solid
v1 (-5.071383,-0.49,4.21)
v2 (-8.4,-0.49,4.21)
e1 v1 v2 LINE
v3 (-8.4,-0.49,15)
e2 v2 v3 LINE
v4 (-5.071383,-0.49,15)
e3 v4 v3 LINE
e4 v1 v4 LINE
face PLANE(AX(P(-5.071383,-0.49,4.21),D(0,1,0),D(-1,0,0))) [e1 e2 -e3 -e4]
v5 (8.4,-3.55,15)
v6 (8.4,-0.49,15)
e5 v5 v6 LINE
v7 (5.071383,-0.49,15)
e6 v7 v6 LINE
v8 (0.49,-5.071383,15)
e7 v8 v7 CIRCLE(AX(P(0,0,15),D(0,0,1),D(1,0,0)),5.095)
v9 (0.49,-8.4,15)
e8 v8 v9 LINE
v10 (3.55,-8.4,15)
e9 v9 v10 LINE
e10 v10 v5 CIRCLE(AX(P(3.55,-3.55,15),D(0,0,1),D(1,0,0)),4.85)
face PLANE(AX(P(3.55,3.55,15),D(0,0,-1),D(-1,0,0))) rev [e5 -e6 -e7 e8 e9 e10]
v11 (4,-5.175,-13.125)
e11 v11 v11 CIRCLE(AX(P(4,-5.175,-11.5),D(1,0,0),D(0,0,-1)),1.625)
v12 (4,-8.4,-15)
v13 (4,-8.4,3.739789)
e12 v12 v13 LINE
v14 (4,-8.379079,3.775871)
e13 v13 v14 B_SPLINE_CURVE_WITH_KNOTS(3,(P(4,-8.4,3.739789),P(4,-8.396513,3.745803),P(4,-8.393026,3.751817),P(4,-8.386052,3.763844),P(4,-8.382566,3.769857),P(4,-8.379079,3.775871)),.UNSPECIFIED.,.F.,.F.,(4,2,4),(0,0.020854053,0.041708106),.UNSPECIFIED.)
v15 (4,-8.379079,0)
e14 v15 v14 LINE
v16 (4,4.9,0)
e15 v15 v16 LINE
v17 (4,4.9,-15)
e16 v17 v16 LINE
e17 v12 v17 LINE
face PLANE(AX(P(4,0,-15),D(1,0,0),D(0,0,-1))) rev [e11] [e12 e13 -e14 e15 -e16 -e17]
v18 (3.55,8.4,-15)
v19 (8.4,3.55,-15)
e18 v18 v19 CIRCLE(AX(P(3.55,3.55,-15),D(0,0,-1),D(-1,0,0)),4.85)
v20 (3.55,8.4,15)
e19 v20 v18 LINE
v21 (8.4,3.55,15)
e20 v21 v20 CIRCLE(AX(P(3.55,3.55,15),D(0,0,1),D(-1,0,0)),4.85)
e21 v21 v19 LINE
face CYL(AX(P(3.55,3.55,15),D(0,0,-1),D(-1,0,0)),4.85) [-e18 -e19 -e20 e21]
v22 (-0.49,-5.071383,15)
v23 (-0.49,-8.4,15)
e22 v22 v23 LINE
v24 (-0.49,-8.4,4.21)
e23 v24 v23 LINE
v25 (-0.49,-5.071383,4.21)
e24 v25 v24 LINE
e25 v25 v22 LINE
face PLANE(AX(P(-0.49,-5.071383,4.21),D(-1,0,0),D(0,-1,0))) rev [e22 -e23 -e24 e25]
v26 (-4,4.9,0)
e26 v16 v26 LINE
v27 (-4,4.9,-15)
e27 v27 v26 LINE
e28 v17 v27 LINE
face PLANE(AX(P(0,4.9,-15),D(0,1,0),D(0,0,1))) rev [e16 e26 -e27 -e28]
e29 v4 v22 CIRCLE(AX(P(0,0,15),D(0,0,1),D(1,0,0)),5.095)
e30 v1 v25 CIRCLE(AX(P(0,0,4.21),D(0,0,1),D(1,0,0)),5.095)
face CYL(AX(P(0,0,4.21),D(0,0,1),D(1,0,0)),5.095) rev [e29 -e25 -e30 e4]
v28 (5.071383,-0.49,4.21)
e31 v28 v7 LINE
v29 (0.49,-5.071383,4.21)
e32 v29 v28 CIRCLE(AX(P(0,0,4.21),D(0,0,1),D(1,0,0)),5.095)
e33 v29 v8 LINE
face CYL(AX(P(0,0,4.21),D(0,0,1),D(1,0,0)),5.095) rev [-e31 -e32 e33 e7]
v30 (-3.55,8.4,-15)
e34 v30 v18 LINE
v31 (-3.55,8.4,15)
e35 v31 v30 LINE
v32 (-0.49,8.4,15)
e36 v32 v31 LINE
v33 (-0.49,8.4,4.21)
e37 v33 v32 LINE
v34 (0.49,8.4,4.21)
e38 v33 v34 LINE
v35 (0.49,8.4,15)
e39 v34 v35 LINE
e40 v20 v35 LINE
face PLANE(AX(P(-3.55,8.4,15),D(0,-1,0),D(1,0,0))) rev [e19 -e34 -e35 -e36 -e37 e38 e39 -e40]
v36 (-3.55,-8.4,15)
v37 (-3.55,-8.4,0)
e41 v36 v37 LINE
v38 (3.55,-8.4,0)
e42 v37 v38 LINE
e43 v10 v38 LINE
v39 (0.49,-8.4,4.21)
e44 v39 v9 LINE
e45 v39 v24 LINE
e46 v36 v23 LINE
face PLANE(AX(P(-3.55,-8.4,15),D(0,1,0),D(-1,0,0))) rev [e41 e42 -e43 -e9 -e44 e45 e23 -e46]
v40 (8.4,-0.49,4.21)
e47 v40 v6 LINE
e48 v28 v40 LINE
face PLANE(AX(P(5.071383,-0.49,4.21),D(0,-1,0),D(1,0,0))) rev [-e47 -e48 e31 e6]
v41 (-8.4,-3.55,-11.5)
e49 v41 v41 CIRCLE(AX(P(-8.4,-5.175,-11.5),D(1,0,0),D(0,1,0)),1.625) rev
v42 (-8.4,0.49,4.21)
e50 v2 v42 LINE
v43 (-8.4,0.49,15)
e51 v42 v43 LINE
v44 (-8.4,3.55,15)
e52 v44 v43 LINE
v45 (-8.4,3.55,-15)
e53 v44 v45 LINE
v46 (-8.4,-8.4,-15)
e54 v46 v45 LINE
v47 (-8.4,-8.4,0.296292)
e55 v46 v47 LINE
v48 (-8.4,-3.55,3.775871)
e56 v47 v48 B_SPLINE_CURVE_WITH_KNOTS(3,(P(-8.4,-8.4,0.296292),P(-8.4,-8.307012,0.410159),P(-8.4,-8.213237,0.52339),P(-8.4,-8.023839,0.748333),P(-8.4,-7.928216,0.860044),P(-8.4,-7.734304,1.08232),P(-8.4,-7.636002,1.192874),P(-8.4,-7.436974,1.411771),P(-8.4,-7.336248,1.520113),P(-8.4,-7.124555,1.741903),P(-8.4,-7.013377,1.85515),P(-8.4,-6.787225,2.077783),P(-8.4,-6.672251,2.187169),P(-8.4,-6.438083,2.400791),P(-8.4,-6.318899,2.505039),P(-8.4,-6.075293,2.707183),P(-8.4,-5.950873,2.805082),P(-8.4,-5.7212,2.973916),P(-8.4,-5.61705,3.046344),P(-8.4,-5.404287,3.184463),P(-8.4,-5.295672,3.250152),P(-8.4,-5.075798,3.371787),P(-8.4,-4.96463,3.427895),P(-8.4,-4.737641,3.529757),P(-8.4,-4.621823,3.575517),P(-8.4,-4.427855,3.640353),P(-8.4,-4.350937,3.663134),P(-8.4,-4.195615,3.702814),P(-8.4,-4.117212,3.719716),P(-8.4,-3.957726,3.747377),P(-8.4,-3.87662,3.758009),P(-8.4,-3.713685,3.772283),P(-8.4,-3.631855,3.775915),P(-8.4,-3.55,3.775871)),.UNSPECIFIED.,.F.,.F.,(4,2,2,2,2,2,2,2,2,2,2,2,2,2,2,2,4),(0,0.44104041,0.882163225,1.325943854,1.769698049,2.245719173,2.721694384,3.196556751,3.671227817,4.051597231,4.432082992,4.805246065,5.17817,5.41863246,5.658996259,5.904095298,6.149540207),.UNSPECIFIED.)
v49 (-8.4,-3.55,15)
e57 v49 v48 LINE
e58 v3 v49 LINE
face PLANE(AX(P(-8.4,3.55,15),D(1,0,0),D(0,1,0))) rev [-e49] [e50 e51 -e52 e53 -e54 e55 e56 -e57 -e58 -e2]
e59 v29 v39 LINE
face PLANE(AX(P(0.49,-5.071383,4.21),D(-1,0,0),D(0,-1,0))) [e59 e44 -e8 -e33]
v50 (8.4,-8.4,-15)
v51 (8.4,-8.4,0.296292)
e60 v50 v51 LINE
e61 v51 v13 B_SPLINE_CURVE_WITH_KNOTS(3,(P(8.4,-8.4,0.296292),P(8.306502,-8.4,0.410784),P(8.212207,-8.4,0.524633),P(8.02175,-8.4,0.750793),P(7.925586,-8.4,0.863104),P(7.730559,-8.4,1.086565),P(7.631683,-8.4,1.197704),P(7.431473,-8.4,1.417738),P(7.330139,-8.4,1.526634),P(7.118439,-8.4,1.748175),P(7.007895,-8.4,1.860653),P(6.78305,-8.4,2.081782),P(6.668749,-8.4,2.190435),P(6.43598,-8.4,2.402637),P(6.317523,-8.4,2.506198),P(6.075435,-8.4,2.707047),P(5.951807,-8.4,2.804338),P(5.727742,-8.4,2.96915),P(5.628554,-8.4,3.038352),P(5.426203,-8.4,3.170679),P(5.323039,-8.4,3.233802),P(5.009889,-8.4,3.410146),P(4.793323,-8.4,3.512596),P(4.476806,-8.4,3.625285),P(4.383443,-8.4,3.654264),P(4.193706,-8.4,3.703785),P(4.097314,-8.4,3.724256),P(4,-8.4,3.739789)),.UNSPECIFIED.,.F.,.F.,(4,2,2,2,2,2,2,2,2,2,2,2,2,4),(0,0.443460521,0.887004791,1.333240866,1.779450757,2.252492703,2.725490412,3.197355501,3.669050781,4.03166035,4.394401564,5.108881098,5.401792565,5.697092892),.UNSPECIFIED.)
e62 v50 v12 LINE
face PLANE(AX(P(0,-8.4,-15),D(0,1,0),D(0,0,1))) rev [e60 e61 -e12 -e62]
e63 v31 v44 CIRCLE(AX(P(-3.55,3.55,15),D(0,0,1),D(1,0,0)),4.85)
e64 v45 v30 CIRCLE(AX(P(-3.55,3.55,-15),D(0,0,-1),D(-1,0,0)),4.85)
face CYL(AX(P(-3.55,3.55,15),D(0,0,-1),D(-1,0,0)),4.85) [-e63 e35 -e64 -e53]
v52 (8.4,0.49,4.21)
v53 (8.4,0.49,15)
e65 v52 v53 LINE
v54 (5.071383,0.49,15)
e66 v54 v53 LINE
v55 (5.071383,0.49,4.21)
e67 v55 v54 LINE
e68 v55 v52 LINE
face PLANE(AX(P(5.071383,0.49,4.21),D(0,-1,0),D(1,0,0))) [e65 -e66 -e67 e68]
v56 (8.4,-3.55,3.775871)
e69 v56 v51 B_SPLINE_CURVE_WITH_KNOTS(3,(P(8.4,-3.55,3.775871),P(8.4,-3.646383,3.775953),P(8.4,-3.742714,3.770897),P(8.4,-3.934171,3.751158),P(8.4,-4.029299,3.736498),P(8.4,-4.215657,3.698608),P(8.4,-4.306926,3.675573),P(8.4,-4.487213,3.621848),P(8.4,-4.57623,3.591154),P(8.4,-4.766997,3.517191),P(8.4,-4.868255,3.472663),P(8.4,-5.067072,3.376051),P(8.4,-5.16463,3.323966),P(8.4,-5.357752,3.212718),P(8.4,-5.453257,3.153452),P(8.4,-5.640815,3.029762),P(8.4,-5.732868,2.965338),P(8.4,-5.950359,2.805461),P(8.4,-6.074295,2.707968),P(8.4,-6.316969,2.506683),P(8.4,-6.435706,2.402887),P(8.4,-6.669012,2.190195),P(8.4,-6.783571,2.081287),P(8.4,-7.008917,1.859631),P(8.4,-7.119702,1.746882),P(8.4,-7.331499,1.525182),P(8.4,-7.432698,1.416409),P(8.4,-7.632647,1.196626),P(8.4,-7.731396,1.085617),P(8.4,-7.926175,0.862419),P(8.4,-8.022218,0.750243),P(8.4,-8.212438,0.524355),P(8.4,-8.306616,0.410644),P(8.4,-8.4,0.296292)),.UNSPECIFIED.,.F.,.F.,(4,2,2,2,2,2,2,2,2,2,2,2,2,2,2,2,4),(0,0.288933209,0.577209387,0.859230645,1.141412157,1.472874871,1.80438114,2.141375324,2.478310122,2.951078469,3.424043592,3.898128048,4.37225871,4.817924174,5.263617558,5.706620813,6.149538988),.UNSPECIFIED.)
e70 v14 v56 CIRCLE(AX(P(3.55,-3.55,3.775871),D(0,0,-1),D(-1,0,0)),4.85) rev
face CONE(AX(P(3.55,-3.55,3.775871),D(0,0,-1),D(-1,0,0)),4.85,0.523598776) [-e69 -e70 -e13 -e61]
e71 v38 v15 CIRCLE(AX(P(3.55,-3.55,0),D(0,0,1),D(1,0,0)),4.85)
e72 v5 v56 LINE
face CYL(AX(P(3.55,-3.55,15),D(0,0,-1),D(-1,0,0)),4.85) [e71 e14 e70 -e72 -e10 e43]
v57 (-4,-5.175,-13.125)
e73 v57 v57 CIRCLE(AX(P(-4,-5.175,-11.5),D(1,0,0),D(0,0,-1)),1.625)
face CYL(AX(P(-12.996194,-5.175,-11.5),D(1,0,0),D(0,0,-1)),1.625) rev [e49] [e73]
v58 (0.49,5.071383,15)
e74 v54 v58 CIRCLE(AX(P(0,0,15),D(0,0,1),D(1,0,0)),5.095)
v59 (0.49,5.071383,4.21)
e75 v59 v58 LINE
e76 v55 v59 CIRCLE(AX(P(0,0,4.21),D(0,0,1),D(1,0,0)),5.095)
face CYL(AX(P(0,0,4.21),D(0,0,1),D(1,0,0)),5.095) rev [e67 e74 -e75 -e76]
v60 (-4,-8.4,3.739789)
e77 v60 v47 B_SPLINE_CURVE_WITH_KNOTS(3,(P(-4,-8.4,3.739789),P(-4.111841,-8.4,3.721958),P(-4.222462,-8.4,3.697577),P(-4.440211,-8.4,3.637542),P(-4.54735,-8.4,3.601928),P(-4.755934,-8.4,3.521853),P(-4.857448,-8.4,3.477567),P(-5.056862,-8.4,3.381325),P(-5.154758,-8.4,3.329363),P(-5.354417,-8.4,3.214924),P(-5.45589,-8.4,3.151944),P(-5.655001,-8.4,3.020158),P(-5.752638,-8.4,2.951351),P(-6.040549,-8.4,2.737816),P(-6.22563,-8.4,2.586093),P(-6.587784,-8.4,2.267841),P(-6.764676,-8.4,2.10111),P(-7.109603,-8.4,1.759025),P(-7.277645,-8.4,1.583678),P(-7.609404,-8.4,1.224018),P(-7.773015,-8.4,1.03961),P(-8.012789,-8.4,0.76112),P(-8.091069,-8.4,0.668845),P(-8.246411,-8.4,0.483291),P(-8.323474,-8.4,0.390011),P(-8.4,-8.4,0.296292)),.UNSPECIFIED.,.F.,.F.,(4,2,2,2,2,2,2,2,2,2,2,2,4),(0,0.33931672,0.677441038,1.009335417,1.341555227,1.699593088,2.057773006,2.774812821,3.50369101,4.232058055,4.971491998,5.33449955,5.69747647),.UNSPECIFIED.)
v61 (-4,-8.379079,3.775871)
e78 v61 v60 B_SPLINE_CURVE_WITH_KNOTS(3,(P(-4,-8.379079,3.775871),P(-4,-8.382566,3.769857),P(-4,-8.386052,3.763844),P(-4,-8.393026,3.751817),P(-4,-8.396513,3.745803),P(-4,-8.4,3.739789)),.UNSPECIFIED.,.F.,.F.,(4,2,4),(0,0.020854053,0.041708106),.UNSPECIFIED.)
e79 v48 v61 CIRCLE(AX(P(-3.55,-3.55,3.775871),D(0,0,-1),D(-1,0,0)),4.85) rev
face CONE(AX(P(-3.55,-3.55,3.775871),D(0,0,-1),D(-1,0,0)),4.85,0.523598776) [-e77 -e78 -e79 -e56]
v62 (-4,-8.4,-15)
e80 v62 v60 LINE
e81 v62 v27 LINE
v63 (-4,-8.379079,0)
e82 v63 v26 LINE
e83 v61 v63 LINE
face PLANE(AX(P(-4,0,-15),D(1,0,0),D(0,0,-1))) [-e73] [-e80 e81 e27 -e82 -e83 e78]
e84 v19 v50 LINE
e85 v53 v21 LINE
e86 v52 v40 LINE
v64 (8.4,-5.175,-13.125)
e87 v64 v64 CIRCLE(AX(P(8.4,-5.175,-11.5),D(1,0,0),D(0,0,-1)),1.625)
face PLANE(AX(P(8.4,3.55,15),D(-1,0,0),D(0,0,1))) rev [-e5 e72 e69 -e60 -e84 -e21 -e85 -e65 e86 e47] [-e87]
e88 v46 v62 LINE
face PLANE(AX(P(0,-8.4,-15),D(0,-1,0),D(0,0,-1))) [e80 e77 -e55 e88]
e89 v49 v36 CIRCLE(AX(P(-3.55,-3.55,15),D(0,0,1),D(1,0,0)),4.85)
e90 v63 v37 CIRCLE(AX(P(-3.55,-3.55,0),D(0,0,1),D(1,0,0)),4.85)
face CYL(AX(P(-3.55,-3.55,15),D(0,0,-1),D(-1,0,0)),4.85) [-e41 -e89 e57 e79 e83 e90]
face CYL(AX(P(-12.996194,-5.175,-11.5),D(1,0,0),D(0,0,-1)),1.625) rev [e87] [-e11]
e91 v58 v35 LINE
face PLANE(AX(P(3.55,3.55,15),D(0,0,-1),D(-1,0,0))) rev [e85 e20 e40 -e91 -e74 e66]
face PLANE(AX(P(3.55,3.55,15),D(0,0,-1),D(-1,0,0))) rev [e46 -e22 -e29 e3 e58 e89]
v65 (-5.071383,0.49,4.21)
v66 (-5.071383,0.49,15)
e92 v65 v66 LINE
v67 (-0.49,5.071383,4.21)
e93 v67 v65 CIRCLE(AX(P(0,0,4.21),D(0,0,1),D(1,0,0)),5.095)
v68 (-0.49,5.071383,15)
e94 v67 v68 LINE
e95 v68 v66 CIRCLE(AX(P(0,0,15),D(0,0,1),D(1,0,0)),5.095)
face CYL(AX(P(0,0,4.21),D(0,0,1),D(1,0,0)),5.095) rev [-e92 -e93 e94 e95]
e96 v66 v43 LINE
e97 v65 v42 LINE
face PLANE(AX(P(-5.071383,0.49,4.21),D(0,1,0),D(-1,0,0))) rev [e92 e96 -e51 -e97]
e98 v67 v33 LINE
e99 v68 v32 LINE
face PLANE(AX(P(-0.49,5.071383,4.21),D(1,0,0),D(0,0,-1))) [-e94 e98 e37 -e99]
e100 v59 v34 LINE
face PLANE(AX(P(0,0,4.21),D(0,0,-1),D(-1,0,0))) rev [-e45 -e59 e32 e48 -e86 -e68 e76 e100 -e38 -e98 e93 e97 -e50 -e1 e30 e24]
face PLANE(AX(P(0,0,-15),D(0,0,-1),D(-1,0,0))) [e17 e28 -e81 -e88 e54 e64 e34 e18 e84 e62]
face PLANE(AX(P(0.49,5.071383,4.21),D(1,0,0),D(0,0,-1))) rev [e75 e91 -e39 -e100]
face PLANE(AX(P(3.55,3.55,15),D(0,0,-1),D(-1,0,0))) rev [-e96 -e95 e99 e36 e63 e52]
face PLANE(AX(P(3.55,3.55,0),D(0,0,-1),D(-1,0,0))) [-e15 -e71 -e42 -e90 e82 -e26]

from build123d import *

# Parameters (mm, degrees)
BOSS_EXTRUDE1_DEPTH = 15
SKETCH2_R           = 5.095
CUT_EXTRUDE1_DEPTH  = 10.79
BOSS_EXTRUDE3_START = 15
BOSS_EXTRUDE3_DEPTH = 15
CUT_EXTRUDE2_REACH  = 26.037
SKETCH7_R           = 1.625
CHAMFER2_SIZE       = 2.18
CHAMFER2_SIZE_2     = 3.775870761


with BuildPart() as part:
    # Sketch1 → Boss-Extrude1 (new body)
    with BuildSketch(Plane.XY):
        with BuildLine():
            Line((-3.55, 8.4), (3.55, 8.4))
            ThreePointArc((3.55, 8.4), (6.979467889, 6.979467889), (8.4, 3.55))
            Line((8.4, 3.55), (8.4, -3.55))
            ThreePointArc((8.4, -3.55), (6.979467889, -6.979467889), (3.55, -8.4))
            Line((3.55, -8.4), (-3.55, -8.4))
            ThreePointArc((-3.55, -8.4), (-6.979467889, -6.979467889), (-8.4, -3.55))
            Line((-8.4, -3.55), (-8.4, 3.55))
            ThreePointArc((-8.4, 3.55), (-6.979467889, 6.979467889), (-3.55, 8.4))
        make_face()
    extrude(amount=BOSS_EXTRUDE1_DEPTH)

    # Sketch2 → Cut-Extrude1 (cut)
    with BuildSketch(Plane.XY.offset(15)):
        Circle(SKETCH2_R)
        with BuildLine():
            Line((0.49, 5.071382947), (0.49, 8.4))
            Line((0.49, 8.4), (-0.49, 8.4))
            Line((-0.49, 8.4), (-0.49, 5.071382947))
            ThreePointArc((-0.49, 5.071382947), (0, 5.095), (0.49, 5.071382947))
        make_face()
        with BuildLine():
            Line((5.071382947, -0.49), (8.4, -0.49))
            Line((8.4, -0.49), (8.4, 0.49))
            Line((8.4, 0.49), (5.071382947, 0.49))
            ThreePointArc((5.071382947, 0.49), (5.095, 0), (5.071382947, -0.49))
        make_face()
        with BuildLine():
            Line((-0.49, -5.071382947), (-0.49, -8.4))
            Line((-0.49, -8.4), (0.49, -8.4))
            Line((0.49, -8.4), (0.49, -5.071382947))
            ThreePointArc((0.49, -5.071382947), (0, -5.095), (-0.49, -5.071382947))
        make_face()
        with BuildLine():
            Line((-5.071382947, 0.49), (-8.4, 0.49))
            Line((-8.4, 0.49), (-8.4, -0.49))
            Line((-8.4, -0.49), (-5.071382947, -0.49))
            ThreePointArc((-5.071382947, -0.49), (-5.095, 0), (-5.071382947, 0.49))
        make_face()
    extrude(amount=-CUT_EXTRUDE1_DEPTH, mode=Mode.SUBTRACT)

    # Sketch4 → Boss-Extrude3 (add)
    with BuildSketch(Plane(origin=(0, 0, 0), x_dir=(-1, 0, 0), z_dir=(0, 0, -1)).offset(BOSS_EXTRUDE3_START)):
        with BuildLine():
            Line((-8.4, 3.55), (-8.4, -8.4))
            Line((-8.4, -8.4), (-4, -8.4))
            Line((-4, -8.4), (-4, 4.9))
            Line((-4, 4.9), (4, 4.9))
            Line((4, 4.9), (4, -8.4))
            Line((4, -8.4), (8.4, -8.4))
            Line((8.4, -8.4), (8.4, 3.55))
            ThreePointArc((8.4, 3.55), (6.979467889, 6.979467889), (3.55, 8.4))
            Line((3.55, 8.4), (-3.55, 8.4))
            ThreePointArc((-3.55, 8.4), (-6.979467889, 6.979467889), (-8.4, 3.55))
        make_face()
    extrude(amount=-BOSS_EXTRUDE3_DEPTH)

    # Cut-Extrude2: up to this face of the body (flat: up to its plane)
    cut_extrude2_end = Plane(part.part.faces().sort_by_distance((-8.4, -1.579649264, -2.351915361))[0])
    # Sketch7 → Cut-Extrude2 (cut, up to the picked face)
    with BuildSketch(Plane(origin=(8.4, 0, 0), x_dir=(0, 0, -1), z_dir=(1, 0, 0)), mode=Mode.PRIVATE) as cut_extrude2_sk1:
        with Locations((11.5, -5.175)):
            Circle(SKETCH7_R)
    cut_extrude2_tool1 = split(extrude(cut_extrude2_sk1.sketch, amount=-CUT_EXTRUDE2_REACH, mode=Mode.PRIVATE), bisect_by=cut_extrude2_end, keep=Keep.BOTH, mode=Mode.PRIVATE)
    add(cut_extrude2_tool1.solids().sort_by(Axis((8.4, -5.175, -11.5), (-1, 0, 0)))[0], mode=Mode.SUBTRACT)

    # Chamfer2
    # the kernel refuses this chamfer: 3.775870761, 2.18 mm, written as the material it adds along each edge
    with BuildSketch(Plane(origin=(-3.55, -3.55, 0), x_dir=(0.9389857690160399, 0.343955993675581, 0), z_dir=(-0.343955993675581, 0.9389857690160399, 0))) as chamfer2_piece_1_section:
        Polygon((4.85 + CHAMFER2_SIZE, 0), (4.85, -CHAMFER2_SIZE_2), (4.85, 0), align=None)
    chamfer2_piece_1 = revolve(axis=Axis((-3.55, -3.55, 0), (0, 0, -1)), revolution_arc=315.559918018, mode=Mode.PRIVATE)
    chamfer2_piece_1 = split(chamfer2_piece_1, bisect_by=Plane(origin=(-4, -7.19796441, 1.47894359), z_dir=(-1, 0, 0)), keep=Keep.TOP, mode=Mode.PRIVATE)
    chamfer2_piece_1 = split(chamfer2_piece_1, bisect_by=Plane(origin=(-7.201843372, -8.4, 1.47894359), z_dir=(0, 1, 0)), keep=Keep.TOP, mode=Mode.PRIVATE)
    chamfer2_piece_1 = split(chamfer2_piece_1, bisect_by=Plane(origin=(-8.4, -7.19796441, 1.47894359), z_dir=(1, 0, 0)), keep=Keep.TOP, mode=Mode.PRIVATE)
    add(chamfer2_piece_1)
    with BuildSketch(Plane(origin=(3.55, -3.55, 0), x_dir=(-0.42959466391895607, 0.9030218295990186, 0), z_dir=(-0.9030218295990186, -0.42959466391895607, 0))) as chamfer2_piece_2_section:
        Polygon((4.85, -CHAMFER2_SIZE_2), (4.85 + CHAMFER2_SIZE, 0), (4.85, 0), align=None)
    chamfer2_piece_2 = revolve(axis=Axis((3.55, -3.55, 0), (0, 0, -1)), revolution_arc=315.559918018, mode=Mode.PRIVATE)
    chamfer2_piece_2 = split(chamfer2_piece_2, bisect_by=Plane(origin=(8.4, -7.197964411, 1.478943589), z_dir=(-1, 0, 0)), keep=Keep.TOP, mode=Mode.PRIVATE)
    chamfer2_piece_2 = split(chamfer2_piece_2, bisect_by=Plane(origin=(7.201843372, -8.4, 1.478943589), z_dir=(0, 1, 0)), keep=Keep.TOP, mode=Mode.PRIVATE)
    chamfer2_piece_2 = split(chamfer2_piece_2, bisect_by=Plane(origin=(4, -7.197964411, 1.478943589), z_dir=(1, 0, 0)), keep=Keep.TOP, mode=Mode.PRIVATE)
    add(chamfer2_piece_2)


solid = part.part
